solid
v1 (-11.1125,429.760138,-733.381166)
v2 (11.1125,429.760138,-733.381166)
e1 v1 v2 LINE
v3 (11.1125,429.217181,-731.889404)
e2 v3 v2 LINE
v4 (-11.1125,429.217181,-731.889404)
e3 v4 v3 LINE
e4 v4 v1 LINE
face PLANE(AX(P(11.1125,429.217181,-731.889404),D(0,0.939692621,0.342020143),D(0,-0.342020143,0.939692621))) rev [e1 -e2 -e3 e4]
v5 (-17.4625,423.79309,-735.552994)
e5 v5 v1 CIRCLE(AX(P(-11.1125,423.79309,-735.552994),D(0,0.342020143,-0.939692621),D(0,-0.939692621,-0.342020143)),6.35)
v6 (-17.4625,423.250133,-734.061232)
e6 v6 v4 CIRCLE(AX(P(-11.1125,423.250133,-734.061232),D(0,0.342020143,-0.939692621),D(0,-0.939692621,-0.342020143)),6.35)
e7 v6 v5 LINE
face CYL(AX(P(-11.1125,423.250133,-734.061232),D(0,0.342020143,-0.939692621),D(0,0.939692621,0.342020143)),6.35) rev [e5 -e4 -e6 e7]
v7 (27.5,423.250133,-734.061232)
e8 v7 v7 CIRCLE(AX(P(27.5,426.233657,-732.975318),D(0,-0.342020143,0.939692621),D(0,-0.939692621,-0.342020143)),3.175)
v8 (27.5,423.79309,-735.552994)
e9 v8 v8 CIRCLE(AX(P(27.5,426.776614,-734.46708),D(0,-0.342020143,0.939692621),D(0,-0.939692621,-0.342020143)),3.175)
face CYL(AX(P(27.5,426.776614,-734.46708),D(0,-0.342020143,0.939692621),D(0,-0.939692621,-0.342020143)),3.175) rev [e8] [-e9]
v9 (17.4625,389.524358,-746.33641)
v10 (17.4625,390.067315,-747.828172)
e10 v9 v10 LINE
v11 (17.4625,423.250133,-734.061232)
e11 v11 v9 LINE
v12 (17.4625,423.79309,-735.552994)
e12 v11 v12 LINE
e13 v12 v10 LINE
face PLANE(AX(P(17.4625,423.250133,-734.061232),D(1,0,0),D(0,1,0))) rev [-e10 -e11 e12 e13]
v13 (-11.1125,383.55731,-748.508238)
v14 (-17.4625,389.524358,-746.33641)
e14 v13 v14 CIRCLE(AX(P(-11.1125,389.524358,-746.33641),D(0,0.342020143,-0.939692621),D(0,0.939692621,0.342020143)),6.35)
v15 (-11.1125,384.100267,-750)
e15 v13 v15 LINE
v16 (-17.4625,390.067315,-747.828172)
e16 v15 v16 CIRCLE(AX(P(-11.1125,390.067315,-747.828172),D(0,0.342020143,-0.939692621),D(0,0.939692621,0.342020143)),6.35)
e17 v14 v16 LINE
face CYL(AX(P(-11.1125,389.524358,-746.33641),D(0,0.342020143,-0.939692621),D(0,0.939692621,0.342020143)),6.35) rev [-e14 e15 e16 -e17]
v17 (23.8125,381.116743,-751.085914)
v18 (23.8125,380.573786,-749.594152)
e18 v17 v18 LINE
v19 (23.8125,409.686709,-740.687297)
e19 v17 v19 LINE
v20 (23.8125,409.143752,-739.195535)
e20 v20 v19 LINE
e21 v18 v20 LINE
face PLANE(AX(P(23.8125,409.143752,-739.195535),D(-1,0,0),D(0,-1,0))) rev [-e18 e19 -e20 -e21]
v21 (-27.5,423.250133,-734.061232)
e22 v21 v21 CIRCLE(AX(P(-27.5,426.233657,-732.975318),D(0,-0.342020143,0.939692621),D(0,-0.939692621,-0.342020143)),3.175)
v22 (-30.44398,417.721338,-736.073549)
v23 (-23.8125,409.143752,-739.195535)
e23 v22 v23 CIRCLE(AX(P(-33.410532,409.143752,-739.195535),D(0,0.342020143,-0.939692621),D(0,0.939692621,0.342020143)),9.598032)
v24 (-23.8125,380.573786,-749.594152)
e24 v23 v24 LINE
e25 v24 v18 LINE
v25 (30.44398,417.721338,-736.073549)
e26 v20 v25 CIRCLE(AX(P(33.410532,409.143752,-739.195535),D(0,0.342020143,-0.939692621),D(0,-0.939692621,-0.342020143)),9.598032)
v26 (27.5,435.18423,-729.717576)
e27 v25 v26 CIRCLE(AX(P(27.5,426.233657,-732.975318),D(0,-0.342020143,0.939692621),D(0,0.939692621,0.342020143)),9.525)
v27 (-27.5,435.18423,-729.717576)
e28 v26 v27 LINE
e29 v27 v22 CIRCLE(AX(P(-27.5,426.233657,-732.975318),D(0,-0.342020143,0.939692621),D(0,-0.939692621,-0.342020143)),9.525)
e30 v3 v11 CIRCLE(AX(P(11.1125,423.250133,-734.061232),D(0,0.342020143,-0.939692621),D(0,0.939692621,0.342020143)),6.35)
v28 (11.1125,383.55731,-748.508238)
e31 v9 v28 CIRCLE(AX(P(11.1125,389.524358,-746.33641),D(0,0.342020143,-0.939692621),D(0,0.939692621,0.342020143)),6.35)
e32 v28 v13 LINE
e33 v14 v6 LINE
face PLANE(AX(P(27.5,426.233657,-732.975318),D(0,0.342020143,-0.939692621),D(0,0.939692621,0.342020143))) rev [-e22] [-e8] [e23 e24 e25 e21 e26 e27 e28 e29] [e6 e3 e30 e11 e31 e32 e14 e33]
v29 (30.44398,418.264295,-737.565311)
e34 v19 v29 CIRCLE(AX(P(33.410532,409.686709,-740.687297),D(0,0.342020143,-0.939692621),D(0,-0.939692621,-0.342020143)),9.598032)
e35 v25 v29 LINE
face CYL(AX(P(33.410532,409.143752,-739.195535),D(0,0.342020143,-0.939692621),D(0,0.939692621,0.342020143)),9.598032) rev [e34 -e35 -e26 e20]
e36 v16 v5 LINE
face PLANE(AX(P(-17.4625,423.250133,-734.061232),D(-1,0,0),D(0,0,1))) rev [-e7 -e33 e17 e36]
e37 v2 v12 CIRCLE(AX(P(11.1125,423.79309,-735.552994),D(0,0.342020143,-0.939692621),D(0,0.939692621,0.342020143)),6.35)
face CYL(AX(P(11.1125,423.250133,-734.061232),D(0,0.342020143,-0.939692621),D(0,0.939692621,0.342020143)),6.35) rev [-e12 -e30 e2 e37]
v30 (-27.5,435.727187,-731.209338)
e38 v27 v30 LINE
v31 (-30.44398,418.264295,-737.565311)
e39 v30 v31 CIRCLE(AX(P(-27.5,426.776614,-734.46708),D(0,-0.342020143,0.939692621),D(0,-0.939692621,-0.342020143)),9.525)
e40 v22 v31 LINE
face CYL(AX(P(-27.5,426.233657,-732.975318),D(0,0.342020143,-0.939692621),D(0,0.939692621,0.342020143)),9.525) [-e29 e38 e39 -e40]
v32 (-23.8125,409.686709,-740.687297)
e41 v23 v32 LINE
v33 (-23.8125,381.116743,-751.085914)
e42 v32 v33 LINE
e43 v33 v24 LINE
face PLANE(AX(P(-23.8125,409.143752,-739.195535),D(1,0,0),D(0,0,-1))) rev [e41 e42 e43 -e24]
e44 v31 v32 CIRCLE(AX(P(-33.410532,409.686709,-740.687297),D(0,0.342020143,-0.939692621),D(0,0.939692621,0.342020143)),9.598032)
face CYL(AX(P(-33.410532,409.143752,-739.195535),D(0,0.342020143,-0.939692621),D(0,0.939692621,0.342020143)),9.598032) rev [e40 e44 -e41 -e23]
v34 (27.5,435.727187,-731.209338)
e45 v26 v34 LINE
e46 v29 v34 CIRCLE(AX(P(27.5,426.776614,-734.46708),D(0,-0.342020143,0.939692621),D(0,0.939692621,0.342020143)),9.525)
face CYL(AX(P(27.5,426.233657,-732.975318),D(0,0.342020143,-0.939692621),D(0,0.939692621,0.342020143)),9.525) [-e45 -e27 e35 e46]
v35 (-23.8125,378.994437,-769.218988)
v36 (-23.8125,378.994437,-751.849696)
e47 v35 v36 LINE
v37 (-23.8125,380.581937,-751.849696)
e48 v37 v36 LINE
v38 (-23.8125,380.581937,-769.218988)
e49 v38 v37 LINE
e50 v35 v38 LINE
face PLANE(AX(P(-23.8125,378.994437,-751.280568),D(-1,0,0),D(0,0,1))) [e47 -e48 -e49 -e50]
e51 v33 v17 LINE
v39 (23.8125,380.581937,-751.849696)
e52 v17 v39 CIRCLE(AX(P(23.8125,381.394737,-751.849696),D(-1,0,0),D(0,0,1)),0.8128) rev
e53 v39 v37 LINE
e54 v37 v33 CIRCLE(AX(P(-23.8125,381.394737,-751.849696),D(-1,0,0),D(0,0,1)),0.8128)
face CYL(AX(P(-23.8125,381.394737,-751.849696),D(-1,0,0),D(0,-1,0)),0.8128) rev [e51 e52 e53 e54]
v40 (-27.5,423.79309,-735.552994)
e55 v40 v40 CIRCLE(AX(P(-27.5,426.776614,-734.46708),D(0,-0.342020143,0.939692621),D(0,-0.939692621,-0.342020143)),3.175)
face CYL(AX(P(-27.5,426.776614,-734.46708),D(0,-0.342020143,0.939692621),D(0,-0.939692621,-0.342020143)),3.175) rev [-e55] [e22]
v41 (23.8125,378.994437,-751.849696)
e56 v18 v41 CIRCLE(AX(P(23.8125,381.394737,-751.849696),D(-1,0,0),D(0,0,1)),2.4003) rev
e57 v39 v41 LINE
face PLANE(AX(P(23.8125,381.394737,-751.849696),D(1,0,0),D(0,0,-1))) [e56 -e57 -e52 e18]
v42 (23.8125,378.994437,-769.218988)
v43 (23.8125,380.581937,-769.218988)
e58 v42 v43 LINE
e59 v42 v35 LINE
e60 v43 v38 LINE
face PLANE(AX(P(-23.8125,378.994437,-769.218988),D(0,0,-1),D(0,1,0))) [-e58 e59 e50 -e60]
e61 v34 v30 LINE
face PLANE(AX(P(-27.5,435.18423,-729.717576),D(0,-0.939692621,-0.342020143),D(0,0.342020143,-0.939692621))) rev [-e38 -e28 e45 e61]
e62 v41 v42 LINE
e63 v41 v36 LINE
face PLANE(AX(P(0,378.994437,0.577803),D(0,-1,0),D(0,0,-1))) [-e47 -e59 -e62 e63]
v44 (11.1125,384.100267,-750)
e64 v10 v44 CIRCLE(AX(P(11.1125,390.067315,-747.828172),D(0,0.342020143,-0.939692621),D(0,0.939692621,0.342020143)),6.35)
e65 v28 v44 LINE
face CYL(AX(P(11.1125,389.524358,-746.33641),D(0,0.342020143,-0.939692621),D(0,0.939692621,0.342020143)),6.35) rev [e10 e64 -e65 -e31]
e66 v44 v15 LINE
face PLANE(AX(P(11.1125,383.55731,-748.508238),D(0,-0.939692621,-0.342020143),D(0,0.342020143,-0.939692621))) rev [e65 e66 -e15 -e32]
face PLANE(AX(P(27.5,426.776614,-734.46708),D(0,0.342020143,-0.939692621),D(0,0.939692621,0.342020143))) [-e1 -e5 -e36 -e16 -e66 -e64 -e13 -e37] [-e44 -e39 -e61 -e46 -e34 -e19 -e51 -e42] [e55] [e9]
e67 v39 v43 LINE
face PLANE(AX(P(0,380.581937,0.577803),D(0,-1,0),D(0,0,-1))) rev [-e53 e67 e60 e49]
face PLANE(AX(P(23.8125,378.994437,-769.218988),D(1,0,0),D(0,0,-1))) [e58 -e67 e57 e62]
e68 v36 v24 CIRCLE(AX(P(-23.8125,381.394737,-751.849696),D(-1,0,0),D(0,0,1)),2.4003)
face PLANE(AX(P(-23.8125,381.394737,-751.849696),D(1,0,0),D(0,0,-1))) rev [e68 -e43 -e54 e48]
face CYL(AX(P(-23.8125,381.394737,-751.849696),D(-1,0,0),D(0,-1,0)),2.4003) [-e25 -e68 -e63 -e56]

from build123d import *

# Parameters (mm, degrees)
BASE_FLANGE1_DEPTH   = 1.5875
EDGE_FLANGE1_START   = -23.8125
EDGE_FLANGE1_DEPTH   = 47.625
EDGE_FLANGE1_2_DEPTH = 47.625
SKETCH9_R            = 3.175
CUT_EXTRUDE1_DEPTH   = 2.54
CUT_EXTRUDE2_DEPTH   = 2.54


# Read off the part's stored shape, not the designer's step: Edge-Flange1
# Sheet-metal steps are written as plain solids
with BuildPart() as part:
    # Sketch1 → Base-Flange1 (new body)
    with BuildSketch(Plane(origin=(0, 285.976549587, -785.714112483), x_dir=(1, 0, 0), z_dir=(0, -0.34202014332566955, 0.9396926207859082))):
        with BuildLine():
            Line((-27.5, 159.361299231), (27.5, 159.361299231))
            ThreePointArc((27.5, 159.361299231), (36.907682688, 151.326645312), (30.443979637, 140.777678536))
            ThreePointArc((30.443979637, 140.777678536), (25.645376408, 137.290929389), (23.8125, 131.64960183))
            Line((23.8125, 131.64960183), (23.8125, 98.987567929))
            Line((23.8125, 98.987567929), (-23.8125, 98.987567929))
            Line((-23.8125, 98.987567929), (-23.8125, 131.64960183))
            ThreePointArc((-23.8125, 131.64960183), (-25.645376408, 137.290929389), (-30.443979637, 140.777678536))
            ThreePointArc((-30.443979637, 140.777678536), (-36.907682688, 151.326645312), (-27.5, 159.361299231))
        make_face()
    extrude(amount=BASE_FLANGE1_DEPTH)

    # Edge-Flange1 outline → Edge-Flange1 (cut)
    with BuildSketch(Plane.YZ.offset(EDGE_FLANGE1_START)):
        with BuildLine():
            Line((378.994436719, -751.858370313), (378.994436719, -751.849696253))
            ThreePointArc((378.994436719, -751.849696253), (379.428526068, -750.472940733), (380.573785769, -749.594152055))
            Line((380.573785769, -749.594152055), (378.451479742, -750.366608277))
            Line((378.451479742, -750.366608277), (378.994436719, -751.858370313))
        make_face()
    extrude(amount=EDGE_FLANGE1_DEPTH, mode=Mode.SUBTRACT)

    # Edge-Flange1 2 outline → Edge-Flange1 2 (add)
    with BuildSketch(Plane.YZ.offset(EDGE_FLANGE1_START)):
        with BuildLine():
            Line((381.116742747, -751.085914091), (378.994436719, -751.858370313))
            Line((378.994436719, -751.858370313), (378.994436719, -769.218988099))
            Line((378.994436719, -769.218988099), (380.581936719, -769.218988099))
            Line((380.581936719, -769.218988099), (380.581936719, -751.849696253))
            ThreePointArc((380.581936719, -751.849696253), (380.728929938, -751.383493326), (381.116742747, -751.085914091))
        make_face()
    extrude(amount=EDGE_FLANGE1_2_DEPTH)

    # Sketch9 → Cut-Extrude1 (cut)
    with BuildSketch(Plane(origin=(0, 285.433592609, -784.222350448), x_dir=(1, 0, 0), z_dir=(0, -0.34202014332566955, 0.9396926207859082))):
        with Locations(Location((-27.5, 149.836299231, 0), (0, 0, 270))):
            Circle(SKETCH9_R)
        with Locations(Location((27.5, 149.836299231, 0), (0, 0, 270))):
            Circle(SKETCH9_R)
    extrude(amount=-CUT_EXTRUDE1_DEPTH, mode=Mode.SUBTRACT)

    # Sketch10 → Cut-Extrude2 (cut)
    with BuildSketch(Plane(origin=(0, 285.976549587, -785.714112483), x_dir=(-1, 0, 0), z_dir=(0, 0.34202014332566955, -0.9396926207859082))):
        with BuildLine():
            Line((-11.1125, 153.011299231), (11.1125, 153.011299231))
            ThreePointArc((11.1125, 153.011299231), (15.602628061, 151.151427292), (17.4625, 146.661299231))
            Line((17.4625, 146.661299231), (17.4625, 110.77107883))
            ThreePointArc((17.4625, 110.77107883), (15.602628061, 106.28095077), (11.1125, 104.42107883))
            Line((11.1125, 104.42107883), (-11.1125, 104.42107883))
            ThreePointArc((-11.1125, 104.42107883), (-15.602628061, 106.28095077), (-17.4625, 110.77107883))
            Line((-17.4625, 110.77107883), (-17.4625, 146.661299231))
            ThreePointArc((-17.4625, 146.661299231), (-15.602628061, 151.151427292), (-11.1125, 153.011299231))
        make_face()
    extrude(amount=-CUT_EXTRUDE2_DEPTH, mode=Mode.SUBTRACT)


solid = part.part
